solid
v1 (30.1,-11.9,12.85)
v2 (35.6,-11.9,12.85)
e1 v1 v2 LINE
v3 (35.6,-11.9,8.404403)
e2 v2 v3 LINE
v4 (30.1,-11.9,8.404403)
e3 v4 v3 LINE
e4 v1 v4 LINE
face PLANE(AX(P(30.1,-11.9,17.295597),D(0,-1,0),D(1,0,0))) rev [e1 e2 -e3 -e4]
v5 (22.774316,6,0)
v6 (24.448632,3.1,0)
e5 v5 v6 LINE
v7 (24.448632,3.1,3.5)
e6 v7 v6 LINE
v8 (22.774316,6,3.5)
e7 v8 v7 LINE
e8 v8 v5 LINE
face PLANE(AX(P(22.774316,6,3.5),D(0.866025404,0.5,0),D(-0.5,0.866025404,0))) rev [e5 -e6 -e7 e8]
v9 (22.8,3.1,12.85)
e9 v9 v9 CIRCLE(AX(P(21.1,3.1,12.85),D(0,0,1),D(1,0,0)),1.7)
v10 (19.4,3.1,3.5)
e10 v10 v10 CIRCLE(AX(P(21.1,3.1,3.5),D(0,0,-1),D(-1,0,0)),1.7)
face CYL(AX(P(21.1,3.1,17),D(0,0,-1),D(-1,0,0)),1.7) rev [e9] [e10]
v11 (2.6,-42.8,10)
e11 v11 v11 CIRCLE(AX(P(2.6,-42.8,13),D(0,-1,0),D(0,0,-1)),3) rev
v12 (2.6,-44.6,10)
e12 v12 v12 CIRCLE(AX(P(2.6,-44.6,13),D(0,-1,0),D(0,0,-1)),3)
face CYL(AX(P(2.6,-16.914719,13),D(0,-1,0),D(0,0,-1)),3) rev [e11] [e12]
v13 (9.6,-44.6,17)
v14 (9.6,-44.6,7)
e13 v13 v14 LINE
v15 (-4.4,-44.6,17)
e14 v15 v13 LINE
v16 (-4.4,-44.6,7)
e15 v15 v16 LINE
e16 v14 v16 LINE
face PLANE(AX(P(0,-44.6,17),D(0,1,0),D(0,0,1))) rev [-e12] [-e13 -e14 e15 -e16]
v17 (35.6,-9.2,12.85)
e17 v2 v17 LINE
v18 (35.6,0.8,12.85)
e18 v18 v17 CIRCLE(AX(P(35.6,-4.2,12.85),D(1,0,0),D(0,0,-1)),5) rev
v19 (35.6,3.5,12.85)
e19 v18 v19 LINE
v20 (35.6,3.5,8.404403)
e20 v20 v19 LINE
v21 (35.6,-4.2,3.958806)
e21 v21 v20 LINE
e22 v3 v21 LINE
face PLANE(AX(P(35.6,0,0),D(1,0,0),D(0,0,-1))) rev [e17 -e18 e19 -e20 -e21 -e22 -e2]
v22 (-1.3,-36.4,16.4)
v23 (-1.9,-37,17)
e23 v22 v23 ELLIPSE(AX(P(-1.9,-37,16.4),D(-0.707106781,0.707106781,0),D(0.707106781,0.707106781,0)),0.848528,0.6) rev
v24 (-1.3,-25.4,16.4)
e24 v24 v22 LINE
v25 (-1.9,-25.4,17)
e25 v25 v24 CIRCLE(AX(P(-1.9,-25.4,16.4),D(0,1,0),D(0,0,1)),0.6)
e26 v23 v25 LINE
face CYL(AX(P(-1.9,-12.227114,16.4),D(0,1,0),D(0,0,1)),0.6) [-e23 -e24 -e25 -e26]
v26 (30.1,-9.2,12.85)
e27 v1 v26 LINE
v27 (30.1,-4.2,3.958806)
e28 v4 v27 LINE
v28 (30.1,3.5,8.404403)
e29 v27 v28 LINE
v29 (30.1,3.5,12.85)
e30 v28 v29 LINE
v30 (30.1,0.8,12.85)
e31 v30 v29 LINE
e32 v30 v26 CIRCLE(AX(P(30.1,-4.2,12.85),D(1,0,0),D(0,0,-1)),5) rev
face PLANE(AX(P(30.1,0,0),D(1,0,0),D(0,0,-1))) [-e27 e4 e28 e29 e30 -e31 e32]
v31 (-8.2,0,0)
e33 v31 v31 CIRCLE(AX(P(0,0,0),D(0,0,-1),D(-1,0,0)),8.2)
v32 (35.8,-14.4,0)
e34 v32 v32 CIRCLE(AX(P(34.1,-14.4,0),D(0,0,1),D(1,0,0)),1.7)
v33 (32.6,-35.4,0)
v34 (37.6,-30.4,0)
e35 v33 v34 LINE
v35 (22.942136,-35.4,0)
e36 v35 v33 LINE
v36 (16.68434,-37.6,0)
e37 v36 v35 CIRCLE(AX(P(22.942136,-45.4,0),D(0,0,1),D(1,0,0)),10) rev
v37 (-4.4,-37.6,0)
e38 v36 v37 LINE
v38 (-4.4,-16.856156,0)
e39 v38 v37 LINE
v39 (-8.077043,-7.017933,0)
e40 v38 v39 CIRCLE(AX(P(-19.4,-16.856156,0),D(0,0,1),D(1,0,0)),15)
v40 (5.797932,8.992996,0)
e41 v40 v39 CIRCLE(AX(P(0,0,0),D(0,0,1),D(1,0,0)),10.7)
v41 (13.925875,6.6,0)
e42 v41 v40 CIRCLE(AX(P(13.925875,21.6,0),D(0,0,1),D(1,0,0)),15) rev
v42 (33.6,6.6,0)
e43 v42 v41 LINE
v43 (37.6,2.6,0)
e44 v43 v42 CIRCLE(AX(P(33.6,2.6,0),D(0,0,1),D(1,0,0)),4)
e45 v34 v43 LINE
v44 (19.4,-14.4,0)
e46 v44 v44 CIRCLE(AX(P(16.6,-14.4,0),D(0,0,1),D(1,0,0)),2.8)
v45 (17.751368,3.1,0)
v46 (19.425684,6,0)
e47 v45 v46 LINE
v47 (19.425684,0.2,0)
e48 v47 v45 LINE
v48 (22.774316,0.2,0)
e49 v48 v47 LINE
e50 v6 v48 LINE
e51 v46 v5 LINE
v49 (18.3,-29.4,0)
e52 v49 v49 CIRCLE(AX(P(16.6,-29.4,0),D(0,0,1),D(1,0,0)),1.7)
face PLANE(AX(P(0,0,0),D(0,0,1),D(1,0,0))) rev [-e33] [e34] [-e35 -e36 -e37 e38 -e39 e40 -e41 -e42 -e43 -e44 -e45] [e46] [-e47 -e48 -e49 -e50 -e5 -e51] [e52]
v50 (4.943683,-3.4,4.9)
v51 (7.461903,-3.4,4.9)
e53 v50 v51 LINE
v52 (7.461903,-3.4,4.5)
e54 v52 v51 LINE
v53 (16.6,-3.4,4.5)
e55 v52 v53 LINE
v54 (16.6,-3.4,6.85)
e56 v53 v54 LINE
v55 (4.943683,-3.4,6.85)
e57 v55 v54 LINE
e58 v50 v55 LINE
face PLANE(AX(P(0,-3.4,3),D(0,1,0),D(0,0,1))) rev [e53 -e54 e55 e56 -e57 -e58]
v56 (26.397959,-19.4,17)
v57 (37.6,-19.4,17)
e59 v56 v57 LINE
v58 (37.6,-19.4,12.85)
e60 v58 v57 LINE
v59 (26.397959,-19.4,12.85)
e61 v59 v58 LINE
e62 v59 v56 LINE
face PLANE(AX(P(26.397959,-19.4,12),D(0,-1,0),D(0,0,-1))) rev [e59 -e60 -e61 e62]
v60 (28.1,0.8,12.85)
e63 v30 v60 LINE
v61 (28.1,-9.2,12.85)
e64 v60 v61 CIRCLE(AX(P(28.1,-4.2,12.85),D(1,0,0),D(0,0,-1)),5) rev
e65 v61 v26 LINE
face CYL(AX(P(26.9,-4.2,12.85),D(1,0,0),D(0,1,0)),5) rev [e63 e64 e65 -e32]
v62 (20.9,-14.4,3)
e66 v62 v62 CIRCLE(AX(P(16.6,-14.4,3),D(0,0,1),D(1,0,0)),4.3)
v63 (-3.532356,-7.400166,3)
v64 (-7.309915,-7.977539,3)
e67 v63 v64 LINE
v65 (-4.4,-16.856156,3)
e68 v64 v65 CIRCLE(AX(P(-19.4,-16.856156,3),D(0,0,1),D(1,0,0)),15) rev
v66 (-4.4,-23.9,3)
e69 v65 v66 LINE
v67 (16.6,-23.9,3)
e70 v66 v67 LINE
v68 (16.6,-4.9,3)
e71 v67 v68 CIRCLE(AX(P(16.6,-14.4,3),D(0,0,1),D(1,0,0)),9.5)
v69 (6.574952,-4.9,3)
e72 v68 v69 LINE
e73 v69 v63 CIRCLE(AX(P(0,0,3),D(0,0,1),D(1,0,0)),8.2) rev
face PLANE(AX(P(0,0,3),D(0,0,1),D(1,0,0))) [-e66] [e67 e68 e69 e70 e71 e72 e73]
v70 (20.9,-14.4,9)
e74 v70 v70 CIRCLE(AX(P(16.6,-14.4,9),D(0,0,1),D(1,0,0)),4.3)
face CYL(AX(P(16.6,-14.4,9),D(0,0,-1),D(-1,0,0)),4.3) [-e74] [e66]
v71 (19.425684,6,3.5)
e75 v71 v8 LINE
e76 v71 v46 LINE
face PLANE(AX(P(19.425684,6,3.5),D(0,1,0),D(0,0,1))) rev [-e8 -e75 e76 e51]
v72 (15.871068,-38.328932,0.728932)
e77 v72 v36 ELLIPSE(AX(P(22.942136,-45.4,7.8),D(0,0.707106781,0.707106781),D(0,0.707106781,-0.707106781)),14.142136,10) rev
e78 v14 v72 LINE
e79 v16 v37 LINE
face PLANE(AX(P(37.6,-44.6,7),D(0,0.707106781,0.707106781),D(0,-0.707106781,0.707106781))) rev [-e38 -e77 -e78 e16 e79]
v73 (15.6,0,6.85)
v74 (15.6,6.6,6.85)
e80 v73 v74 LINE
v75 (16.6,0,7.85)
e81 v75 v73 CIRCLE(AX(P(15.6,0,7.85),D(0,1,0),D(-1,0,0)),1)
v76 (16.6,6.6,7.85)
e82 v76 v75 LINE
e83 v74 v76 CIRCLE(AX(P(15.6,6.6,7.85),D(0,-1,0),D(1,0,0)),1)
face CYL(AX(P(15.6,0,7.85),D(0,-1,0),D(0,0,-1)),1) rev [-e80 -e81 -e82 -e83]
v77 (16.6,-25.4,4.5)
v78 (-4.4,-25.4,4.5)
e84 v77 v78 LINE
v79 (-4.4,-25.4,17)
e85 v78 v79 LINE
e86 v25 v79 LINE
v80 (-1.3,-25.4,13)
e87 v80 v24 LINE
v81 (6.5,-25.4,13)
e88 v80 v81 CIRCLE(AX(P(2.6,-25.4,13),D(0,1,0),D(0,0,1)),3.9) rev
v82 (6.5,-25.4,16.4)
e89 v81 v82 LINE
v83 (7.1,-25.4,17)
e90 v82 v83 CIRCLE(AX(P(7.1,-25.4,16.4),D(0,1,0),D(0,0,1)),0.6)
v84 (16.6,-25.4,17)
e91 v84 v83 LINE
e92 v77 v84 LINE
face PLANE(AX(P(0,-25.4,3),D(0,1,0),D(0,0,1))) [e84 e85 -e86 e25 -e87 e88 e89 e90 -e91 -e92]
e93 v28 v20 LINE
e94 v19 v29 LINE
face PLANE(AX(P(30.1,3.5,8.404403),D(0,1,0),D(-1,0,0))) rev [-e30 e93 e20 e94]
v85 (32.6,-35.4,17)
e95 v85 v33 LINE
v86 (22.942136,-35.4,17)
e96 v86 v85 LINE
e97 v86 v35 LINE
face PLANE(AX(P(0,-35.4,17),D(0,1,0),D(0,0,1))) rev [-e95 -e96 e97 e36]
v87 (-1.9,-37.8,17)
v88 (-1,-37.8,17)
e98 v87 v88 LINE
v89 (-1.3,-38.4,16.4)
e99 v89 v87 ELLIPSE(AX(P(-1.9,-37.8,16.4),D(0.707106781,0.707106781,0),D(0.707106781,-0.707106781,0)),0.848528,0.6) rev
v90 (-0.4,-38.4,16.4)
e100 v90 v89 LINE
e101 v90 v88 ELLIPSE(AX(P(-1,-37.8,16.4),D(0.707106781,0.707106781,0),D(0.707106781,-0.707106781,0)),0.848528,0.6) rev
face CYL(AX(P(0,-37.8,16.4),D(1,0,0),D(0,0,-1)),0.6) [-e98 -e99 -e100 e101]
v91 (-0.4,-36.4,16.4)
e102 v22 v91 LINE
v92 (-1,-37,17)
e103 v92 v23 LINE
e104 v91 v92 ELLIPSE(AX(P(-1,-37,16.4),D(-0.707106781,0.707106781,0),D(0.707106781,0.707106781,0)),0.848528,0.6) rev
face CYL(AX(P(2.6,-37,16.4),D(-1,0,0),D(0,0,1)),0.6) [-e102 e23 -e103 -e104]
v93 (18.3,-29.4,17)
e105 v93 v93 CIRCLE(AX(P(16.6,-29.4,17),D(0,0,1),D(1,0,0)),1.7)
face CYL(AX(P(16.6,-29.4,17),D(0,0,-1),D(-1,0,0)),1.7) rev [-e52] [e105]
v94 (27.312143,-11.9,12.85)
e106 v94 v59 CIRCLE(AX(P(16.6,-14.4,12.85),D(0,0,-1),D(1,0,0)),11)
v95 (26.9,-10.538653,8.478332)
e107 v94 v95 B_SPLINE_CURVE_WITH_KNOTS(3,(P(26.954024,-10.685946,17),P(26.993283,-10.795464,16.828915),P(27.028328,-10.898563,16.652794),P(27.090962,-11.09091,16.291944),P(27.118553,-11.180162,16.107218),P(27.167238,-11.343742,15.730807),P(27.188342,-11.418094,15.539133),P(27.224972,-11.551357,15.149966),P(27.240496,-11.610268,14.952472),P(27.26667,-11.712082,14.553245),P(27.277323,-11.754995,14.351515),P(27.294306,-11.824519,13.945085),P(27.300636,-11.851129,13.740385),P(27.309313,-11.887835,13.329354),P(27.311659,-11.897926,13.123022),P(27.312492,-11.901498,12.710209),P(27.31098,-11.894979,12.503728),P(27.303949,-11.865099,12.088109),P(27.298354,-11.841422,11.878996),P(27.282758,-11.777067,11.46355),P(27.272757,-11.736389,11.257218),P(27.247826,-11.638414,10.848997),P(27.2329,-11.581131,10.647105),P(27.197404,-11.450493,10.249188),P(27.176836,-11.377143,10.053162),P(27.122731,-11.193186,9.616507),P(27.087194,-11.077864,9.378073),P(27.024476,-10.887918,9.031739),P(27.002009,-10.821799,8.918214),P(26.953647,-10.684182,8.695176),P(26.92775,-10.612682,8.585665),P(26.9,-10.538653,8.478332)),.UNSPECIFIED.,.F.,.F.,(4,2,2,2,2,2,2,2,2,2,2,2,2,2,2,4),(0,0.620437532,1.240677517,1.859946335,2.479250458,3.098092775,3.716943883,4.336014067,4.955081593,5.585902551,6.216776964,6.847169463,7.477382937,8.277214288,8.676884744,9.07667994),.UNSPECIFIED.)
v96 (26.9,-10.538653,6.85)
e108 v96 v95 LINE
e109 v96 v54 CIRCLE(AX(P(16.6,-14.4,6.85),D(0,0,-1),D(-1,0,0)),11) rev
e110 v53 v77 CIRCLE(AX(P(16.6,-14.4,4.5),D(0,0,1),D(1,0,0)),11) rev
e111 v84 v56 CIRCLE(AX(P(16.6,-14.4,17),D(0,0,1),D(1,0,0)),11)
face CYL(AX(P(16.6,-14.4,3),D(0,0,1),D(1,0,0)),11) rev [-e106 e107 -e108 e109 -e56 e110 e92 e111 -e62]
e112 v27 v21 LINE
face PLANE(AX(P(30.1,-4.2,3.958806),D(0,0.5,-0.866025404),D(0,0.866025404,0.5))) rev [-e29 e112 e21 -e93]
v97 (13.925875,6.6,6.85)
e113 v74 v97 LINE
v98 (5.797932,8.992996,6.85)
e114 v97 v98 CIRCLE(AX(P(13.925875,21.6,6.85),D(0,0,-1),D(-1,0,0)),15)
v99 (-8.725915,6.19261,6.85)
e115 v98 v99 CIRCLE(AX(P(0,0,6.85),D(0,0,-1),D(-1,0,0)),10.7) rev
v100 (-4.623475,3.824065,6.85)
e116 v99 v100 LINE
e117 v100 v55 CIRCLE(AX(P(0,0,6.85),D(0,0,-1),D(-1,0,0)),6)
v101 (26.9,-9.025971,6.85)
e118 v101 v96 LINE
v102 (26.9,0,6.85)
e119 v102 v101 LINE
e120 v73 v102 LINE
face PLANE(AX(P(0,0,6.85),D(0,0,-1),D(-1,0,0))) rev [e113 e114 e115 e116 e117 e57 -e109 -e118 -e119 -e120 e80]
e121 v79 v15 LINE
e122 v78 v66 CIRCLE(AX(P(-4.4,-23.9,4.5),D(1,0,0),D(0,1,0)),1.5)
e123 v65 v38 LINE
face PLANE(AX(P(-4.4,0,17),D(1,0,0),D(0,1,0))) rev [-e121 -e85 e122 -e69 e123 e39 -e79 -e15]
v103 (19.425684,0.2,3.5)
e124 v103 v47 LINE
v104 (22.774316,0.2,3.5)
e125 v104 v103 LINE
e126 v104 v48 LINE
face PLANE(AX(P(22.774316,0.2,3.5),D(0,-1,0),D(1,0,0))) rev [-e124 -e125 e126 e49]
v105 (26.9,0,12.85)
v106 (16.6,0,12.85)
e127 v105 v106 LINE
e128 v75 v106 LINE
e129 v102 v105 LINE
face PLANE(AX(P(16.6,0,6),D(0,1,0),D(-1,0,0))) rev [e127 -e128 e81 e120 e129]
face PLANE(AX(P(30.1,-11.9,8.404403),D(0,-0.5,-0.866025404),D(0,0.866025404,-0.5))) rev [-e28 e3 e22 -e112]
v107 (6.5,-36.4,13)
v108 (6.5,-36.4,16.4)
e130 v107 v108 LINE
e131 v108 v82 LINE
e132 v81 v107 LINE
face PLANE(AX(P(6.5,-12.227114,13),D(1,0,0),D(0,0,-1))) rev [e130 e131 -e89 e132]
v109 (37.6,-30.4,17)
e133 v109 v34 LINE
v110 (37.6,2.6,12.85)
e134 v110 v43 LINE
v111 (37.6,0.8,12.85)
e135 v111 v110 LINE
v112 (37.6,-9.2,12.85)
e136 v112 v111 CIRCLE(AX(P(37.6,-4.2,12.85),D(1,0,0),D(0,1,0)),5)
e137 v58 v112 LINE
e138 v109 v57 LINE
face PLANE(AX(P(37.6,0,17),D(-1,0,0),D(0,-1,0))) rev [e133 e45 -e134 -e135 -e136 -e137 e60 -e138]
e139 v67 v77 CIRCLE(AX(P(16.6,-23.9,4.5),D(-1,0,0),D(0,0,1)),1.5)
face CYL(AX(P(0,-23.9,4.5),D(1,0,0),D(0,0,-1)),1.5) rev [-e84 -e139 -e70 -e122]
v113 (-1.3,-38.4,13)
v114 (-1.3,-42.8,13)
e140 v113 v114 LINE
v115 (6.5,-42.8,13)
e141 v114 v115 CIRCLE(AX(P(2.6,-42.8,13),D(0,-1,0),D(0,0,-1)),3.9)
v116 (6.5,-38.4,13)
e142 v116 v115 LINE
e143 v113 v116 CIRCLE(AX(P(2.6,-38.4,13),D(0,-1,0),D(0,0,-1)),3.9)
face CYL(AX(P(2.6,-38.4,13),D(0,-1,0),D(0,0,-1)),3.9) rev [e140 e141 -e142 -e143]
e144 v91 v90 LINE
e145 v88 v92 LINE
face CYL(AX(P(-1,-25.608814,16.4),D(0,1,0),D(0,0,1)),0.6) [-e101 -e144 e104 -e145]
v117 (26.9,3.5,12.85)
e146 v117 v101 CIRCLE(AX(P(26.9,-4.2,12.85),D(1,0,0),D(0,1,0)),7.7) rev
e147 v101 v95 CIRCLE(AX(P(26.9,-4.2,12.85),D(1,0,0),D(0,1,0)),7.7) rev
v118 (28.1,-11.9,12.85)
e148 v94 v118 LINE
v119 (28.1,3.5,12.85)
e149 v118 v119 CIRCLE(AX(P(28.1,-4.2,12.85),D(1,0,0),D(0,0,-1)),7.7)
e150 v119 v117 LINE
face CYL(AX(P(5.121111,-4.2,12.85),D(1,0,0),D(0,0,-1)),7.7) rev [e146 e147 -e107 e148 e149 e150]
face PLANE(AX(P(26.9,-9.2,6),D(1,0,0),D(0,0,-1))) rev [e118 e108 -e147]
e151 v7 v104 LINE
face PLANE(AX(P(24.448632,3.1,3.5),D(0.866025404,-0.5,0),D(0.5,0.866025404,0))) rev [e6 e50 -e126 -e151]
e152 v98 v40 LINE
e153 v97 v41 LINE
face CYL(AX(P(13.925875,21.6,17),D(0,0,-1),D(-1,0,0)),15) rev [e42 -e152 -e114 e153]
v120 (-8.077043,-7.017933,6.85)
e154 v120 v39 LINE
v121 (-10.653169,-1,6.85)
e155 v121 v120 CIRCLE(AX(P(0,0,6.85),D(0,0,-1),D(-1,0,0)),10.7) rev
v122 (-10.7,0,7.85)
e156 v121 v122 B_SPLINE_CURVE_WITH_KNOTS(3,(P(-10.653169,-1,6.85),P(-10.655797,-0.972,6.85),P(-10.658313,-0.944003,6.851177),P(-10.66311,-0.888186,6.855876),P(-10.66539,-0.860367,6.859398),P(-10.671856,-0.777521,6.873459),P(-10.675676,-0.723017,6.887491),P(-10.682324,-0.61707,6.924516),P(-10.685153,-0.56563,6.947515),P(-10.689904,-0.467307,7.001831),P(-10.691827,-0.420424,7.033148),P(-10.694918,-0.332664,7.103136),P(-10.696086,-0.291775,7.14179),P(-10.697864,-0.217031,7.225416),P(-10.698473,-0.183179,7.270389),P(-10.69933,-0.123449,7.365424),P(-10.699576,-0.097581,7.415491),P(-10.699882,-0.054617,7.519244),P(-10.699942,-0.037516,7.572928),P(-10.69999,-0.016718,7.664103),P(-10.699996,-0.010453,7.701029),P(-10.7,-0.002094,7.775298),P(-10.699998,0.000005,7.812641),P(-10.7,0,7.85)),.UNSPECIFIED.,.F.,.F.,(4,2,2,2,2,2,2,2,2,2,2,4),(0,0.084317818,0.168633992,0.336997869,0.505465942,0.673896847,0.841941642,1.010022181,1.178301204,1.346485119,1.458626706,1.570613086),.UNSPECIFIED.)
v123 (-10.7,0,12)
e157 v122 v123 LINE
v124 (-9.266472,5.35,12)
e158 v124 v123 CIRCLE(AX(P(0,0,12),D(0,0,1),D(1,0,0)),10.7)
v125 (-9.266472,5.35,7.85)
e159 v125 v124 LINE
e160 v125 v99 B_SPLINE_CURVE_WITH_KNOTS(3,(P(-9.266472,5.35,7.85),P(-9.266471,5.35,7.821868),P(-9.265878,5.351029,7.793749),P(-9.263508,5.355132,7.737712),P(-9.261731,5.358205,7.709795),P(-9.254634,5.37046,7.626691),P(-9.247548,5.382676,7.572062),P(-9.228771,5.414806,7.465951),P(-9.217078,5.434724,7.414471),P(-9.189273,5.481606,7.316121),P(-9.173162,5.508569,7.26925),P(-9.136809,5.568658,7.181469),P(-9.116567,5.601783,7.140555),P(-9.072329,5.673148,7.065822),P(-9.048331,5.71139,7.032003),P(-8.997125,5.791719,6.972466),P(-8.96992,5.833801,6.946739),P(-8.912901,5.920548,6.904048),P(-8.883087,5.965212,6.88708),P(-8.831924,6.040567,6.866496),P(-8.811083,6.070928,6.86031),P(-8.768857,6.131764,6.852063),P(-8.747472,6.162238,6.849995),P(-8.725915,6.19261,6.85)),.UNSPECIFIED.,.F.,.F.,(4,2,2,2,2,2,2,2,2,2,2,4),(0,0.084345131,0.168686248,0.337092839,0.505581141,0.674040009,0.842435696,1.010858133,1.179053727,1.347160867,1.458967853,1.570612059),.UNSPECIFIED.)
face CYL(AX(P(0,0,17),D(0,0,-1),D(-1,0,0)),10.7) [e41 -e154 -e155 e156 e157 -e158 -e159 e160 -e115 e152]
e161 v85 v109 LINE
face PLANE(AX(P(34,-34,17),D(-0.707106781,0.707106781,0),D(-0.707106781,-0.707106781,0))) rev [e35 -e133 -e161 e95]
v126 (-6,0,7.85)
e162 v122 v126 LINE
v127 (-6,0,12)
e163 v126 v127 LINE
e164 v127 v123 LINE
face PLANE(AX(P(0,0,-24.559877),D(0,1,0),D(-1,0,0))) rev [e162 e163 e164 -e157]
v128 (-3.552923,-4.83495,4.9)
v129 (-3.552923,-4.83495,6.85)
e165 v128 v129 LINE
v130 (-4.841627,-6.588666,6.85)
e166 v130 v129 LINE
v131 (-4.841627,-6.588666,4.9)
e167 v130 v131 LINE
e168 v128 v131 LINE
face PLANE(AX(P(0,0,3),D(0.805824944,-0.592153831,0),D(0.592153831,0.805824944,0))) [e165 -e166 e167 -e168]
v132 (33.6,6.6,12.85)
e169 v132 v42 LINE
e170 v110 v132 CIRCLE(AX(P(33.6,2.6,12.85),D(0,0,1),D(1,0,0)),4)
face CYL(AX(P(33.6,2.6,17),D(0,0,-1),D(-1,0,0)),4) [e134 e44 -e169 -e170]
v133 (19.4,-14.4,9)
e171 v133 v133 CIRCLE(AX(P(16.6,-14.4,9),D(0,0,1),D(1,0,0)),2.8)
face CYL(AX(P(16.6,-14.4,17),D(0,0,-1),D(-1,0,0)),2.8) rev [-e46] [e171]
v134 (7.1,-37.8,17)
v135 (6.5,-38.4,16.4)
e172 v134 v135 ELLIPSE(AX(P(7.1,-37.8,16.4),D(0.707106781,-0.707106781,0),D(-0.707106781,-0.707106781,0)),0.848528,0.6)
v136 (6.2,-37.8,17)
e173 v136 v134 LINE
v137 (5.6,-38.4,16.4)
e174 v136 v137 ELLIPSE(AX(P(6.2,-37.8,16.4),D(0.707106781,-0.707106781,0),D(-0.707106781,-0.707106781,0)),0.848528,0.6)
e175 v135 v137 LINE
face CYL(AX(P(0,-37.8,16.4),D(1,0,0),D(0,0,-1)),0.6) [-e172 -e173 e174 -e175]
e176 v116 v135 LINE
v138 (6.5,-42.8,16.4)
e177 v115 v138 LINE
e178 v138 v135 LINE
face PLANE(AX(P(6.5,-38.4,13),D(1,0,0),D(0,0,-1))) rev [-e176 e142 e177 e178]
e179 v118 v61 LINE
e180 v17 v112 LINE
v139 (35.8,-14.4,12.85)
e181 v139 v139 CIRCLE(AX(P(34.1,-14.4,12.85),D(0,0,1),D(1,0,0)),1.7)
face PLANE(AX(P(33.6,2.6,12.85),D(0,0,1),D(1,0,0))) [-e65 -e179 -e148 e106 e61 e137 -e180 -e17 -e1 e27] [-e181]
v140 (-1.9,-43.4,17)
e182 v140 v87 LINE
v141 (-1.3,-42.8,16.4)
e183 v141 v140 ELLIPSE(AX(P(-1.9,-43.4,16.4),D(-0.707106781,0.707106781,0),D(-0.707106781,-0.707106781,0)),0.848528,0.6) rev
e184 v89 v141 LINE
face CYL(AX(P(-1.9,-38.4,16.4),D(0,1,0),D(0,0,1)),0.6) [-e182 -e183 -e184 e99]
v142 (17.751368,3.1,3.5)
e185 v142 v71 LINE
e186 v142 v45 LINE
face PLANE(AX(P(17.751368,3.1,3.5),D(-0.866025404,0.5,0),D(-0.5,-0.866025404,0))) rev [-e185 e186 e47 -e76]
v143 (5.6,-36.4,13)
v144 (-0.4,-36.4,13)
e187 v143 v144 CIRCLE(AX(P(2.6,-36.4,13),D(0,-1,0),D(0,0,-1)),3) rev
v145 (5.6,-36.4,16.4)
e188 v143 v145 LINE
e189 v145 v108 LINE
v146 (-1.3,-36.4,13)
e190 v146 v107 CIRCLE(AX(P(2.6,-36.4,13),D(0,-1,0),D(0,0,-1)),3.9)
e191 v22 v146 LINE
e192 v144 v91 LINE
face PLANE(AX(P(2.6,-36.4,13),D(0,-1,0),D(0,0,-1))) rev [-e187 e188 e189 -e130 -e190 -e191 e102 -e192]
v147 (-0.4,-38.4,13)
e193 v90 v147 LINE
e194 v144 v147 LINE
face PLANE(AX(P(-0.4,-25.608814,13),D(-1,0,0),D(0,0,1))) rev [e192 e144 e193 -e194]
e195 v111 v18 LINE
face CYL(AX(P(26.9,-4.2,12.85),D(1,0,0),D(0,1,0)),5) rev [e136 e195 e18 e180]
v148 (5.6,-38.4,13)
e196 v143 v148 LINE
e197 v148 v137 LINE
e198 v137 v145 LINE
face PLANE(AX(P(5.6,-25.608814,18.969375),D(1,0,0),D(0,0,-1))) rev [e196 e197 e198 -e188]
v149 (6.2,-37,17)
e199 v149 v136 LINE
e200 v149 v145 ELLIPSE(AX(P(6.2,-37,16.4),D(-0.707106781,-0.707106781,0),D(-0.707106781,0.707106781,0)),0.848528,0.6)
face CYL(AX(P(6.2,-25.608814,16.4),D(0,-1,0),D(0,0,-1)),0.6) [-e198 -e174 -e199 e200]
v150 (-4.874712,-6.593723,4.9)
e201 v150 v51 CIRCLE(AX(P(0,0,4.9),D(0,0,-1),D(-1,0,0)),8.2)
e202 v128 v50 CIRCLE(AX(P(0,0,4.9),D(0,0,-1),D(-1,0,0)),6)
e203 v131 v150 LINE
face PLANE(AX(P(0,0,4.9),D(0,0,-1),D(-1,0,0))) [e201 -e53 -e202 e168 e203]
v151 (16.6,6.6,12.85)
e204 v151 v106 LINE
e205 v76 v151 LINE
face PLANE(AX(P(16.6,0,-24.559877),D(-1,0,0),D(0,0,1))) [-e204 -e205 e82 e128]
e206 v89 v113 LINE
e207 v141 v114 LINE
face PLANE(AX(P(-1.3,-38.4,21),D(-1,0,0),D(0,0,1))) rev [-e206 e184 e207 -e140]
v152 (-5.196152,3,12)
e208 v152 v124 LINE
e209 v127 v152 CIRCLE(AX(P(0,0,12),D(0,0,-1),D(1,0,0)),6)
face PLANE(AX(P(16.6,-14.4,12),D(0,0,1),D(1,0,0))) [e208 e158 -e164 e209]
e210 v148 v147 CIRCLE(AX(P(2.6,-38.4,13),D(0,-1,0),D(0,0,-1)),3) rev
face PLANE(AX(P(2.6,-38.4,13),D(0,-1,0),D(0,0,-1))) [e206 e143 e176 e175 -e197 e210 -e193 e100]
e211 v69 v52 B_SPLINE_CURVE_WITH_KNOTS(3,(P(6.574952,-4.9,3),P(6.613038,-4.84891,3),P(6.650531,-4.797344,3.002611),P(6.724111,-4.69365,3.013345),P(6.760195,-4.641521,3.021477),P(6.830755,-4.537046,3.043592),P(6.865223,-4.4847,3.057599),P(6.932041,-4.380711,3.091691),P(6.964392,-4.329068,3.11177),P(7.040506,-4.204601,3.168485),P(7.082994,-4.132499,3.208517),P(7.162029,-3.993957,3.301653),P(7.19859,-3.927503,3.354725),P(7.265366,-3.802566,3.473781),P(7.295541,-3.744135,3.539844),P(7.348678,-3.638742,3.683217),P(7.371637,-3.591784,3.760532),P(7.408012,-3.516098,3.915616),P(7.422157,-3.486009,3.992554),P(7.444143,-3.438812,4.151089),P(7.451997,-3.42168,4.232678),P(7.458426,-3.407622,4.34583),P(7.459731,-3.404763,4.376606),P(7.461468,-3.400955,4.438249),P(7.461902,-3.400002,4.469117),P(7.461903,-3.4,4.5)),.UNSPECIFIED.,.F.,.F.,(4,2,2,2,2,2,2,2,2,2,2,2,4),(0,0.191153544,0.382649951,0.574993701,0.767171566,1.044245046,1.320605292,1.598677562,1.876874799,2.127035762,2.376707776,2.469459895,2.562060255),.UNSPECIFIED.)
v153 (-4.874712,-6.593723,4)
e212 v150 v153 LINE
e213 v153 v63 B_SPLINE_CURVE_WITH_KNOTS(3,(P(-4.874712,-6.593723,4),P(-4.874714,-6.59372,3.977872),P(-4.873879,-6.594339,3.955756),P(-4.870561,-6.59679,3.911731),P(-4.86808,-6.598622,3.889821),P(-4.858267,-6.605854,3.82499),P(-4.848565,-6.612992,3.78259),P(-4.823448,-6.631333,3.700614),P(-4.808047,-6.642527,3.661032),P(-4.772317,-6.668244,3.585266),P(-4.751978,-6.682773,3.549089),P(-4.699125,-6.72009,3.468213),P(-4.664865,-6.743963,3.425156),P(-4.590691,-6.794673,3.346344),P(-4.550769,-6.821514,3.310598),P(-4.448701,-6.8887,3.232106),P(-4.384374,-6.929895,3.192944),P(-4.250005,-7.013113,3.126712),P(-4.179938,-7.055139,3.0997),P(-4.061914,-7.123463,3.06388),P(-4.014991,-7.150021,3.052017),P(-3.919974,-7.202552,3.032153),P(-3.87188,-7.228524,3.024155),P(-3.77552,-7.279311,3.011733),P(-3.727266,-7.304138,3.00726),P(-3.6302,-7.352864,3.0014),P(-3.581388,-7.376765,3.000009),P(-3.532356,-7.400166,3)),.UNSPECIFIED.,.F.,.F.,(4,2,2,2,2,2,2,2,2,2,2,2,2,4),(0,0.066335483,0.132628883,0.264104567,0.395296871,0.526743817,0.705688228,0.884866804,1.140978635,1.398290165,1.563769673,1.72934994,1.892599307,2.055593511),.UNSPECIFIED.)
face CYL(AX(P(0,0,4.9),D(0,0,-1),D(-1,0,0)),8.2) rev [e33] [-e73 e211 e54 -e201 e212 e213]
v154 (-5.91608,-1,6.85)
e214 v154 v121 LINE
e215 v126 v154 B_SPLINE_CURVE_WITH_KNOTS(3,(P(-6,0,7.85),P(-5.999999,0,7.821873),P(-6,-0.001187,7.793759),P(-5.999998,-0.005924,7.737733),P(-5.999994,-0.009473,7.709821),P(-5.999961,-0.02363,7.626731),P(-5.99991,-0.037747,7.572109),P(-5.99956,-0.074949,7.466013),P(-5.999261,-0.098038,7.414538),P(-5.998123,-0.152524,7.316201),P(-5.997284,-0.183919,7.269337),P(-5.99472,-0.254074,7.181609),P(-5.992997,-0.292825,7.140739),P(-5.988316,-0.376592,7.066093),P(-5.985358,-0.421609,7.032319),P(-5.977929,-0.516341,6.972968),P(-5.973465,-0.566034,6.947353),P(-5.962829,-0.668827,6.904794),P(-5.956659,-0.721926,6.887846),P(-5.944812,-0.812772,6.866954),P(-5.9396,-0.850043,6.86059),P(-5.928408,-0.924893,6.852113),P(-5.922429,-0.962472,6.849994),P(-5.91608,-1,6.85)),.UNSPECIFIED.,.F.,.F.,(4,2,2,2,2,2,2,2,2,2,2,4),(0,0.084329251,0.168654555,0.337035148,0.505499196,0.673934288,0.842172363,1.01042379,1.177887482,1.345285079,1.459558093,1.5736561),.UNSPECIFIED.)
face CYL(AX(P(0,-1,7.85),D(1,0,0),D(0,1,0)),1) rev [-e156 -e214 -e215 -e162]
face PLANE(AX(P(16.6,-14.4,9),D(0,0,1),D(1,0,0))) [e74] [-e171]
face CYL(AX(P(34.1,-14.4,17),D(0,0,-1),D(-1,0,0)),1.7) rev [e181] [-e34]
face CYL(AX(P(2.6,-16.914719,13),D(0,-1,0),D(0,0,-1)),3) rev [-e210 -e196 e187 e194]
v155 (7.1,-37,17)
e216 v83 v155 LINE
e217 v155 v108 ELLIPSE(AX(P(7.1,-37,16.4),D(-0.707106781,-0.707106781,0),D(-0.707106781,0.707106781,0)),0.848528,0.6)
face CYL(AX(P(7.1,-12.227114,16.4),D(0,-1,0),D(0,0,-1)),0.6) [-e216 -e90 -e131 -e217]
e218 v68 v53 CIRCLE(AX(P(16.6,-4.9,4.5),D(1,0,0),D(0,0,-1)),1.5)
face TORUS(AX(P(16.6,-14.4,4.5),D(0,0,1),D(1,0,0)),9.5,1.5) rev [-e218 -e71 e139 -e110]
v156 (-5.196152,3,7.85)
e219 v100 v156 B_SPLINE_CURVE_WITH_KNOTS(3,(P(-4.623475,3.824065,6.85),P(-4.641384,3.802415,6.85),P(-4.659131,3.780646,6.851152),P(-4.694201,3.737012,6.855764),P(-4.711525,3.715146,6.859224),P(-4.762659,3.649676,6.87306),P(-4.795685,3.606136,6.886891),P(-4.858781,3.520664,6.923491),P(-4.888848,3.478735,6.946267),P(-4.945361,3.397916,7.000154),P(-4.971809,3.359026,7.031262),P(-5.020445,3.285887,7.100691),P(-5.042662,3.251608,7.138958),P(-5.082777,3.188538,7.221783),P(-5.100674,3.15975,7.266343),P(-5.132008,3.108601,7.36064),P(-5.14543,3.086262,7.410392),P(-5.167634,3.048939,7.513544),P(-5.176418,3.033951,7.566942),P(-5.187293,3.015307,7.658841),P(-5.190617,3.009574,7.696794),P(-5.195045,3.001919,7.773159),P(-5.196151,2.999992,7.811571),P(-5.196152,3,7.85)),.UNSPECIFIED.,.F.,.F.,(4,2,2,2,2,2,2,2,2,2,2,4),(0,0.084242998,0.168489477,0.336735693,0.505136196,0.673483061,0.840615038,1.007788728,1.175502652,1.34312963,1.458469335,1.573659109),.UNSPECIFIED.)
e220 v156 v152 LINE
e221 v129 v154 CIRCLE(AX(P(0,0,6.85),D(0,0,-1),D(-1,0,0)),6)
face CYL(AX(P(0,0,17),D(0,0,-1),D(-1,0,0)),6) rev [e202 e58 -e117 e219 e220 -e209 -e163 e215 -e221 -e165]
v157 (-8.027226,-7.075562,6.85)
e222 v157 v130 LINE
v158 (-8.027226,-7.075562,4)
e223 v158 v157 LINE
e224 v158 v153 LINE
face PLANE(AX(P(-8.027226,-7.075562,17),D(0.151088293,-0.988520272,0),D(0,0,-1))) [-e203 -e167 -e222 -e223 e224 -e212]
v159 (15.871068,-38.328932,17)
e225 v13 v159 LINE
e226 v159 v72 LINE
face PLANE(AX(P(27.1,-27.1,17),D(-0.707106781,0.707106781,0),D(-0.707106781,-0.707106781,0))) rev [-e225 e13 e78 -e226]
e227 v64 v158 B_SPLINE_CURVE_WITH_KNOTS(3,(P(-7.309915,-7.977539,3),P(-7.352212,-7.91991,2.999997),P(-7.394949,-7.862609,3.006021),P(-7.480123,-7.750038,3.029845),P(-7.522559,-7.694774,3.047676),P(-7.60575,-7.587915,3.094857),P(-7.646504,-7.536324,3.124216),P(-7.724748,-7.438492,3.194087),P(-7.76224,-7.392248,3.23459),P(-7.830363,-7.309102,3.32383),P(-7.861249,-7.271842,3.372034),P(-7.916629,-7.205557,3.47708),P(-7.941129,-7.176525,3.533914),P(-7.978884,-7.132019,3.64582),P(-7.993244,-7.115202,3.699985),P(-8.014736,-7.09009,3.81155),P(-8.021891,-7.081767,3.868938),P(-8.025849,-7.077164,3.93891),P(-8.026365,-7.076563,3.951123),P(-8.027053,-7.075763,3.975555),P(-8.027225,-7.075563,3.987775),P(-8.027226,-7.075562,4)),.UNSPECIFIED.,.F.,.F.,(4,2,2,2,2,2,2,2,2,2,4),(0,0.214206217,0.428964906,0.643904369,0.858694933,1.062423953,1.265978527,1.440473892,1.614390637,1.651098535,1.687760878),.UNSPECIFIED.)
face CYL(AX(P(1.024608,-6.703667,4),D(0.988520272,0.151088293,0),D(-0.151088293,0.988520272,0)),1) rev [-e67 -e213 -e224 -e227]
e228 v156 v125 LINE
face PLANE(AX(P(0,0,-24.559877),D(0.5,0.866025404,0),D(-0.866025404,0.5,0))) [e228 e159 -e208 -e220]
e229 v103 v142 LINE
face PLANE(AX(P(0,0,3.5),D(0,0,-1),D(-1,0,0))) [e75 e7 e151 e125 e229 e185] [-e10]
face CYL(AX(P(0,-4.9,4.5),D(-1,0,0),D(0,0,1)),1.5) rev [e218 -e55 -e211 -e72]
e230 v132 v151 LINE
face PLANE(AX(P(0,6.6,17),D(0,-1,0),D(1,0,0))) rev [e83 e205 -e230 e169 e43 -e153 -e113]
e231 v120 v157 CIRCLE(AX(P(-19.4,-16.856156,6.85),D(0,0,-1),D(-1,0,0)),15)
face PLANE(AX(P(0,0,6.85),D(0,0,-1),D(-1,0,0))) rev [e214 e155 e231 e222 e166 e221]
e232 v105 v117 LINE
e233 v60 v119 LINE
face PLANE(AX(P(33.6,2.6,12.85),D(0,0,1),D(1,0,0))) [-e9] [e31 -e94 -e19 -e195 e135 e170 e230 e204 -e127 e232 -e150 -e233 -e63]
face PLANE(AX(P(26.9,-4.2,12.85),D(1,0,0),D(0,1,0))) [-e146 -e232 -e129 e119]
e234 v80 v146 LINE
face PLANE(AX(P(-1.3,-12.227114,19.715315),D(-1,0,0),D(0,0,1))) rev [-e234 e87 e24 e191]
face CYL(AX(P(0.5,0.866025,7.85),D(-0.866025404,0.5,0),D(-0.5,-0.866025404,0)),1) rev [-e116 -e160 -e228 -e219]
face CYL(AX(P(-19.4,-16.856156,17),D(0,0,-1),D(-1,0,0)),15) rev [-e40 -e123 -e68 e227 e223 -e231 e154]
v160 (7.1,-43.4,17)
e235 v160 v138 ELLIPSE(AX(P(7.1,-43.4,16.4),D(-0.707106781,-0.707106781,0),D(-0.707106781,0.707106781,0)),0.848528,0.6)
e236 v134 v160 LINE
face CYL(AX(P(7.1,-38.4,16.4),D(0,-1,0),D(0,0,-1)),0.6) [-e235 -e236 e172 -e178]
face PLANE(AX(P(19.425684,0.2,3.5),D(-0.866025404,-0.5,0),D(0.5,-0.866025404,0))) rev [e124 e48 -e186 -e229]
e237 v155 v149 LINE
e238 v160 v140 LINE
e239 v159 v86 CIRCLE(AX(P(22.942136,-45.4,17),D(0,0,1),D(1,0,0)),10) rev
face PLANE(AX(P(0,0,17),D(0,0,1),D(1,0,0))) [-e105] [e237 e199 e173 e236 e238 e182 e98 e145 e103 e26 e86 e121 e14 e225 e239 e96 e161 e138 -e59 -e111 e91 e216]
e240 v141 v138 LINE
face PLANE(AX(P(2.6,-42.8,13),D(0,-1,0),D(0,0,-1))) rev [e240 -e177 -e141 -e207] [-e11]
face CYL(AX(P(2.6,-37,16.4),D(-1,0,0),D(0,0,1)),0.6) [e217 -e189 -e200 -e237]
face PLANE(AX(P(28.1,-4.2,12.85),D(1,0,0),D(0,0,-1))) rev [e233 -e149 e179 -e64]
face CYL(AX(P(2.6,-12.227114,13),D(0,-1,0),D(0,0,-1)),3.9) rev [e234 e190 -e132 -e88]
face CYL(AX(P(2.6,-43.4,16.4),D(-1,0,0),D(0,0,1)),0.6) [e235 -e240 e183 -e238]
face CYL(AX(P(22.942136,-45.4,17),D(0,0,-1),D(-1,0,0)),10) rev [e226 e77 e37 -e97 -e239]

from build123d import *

# Parameters (mm, degrees)
ESBO_O1_R                = 2.8
ESBO_O1_R_2              = 1.7
ESBO_O1_R_3              = 6
RESSALTO_EXTRUS_O1_DEPTH = 17
CORTE_EXTRUS_O1_DEPTH    = 3.5
ESBO_O3_R                = 8.2
CORTE_EXTRUS_O2_DEPTH    = 4.9
CORTE_EXTRUS_O3_DEPTH    = 64.577983611
CORTE_EXTRUS_O4_START    = -14
ESBO_O7_R                = 2.8
CORTE_EXTRUS_O4_DEPTH    = 14
CORTE_EXTRUS_O5_START    = -5
CORTE_EXTRUS_O5_DEPTH    = 5
ESBO_O9_R                = 4.3
ESBO_O9_R_2              = 2.8
RESSALTO_EXTRUS_O2_DEPTH = 6
ESBO_O6_R                = 3
CORTE_EXTRUS_O6_DEPTH    = 19.2
CORTE_EXTRUS_O7_DEPTH    = 4.4
CORTE_EXTRUS_O8_DEPTH    = 11
CORTE_EXTRUS_O9_DEPTH    = 2
FILETE2_R                = 0.6
CORTE_EXTRUS_O10_START   = -5.15
CORTE_EXTRUS_O10_DEPTH   = 5.15
ESBO_O18_R               = 1.7
RESSALTO_EXTRUS_O3_DEPTH = 0.85
FILETE3_R                = 1
ESBO_O14_R               = 5
CORTE_EXTRUS_O11_DEPTH   = 10.7
CORTE_EXTRUS_O13_DEPTH   = 5.5
CORTE_EXTRUS_O14_START   = -6.85
CORTE_EXTRUS_O14_DEPTH   = 6.85
RESSALTO_EXTRUS_O4_DEPTH = 0.85
CHANFRO3_SIZE            = 3
FILETE4_R                = 1
FILETE5_R                = 1.5
CORTE_EXTRUS_O15_REACH   = 63.511
ESBO_O20_R               = 7.7
CORTE_EXTRUS_O16_START   = -6
CORTE_EXTRUS_O16_DEPTH   = 6


with BuildPart() as part:
    # Esboço1 → Ressalto-extrusão1 (new body)
    with BuildSketch(Plane.XY):
        with BuildLine():
            Line((-4.4, -16.856156145), (-4.4, -44.6))
            Line((-4.4, -44.6), (9.6, -44.6))
            Line((9.6, -44.6), (15.871067812, -38.328932188))
            ThreePointArc((15.871067812, -38.328932188), (19.1153013, -36.161204675), (22.942135624, -35.4))
            Line((22.942135624, -35.4), (32.6, -35.4))
            Line((32.6, -35.4), (37.6, -30.4))
            Line((37.6, -30.4), (37.6, 2.6))
            ThreePointArc((37.6, 2.6), (36.428427125, 5.428427125), (33.6, 6.6))
            Line((33.6, 6.6), (13.925875197, 6.6))
            ThreePointArc((13.925875197, 6.6), (9.689429656, 7.210680031), (5.797932475, 8.992996109))
            ThreePointArc((5.797932475, 8.992996109), (-8.086163888, 7.007421322), (-8.077042802, -7.017932714))
            ThreePointArc((-8.077042802, -7.017932714), (-5.349299698, -11.604697204), (-4.4, -16.856156145))
        make_face()
        with Locations((16.6, -14.4)):
            Circle(ESBO_O1_R, mode=Mode.SUBTRACT)
        with Locations((34.1, -14.4)):
            Circle(ESBO_O1_R_2, mode=Mode.SUBTRACT)
        with Locations((16.6, -29.4)):
            Circle(ESBO_O1_R_2, mode=Mode.SUBTRACT)
        with Locations((21.1, 3.1)):
            Circle(ESBO_O1_R_2, mode=Mode.SUBTRACT)
        Circle(ESBO_O1_R_3, mode=Mode.SUBTRACT)
    extrude(amount=RESSALTO_EXTRUS_O1_DEPTH)

    # Esboço2 → Corte-extrusão1 (cut)
    with BuildSketch(Plane(origin=(0, 0, 0), x_dir=(-1, 0, 0), z_dir=(0, 0, -1))):
        Polygon((-19.425684219, 0.2), (-17.751368439, 3.1), (-19.425684219, 6), (-22.774315781, 6), (-24.448631561, 3.1), (-22.774315781, 0.2), align=None)
    extrude(amount=-CORTE_EXTRUS_O1_DEPTH, mode=Mode.SUBTRACT)

    # Esboço3 → Corte-extrusão2 (cut)
    with BuildSketch(Plane(origin=(0, 0, 0), x_dir=(-1, 0, 0), z_dir=(0, 0, -1))):
        Circle(ESBO_O3_R)
    extrude(amount=-CORTE_EXTRUS_O2_DEPTH, mode=Mode.SUBTRACT)

    # Esboço5 → Corte-extrusão3 (cut, through all)
    with BuildSketch(Plane.ZY.offset(4.4)):
        Polygon((0, -44.6), (7, -44.6), (0, -37.6), align=None)
    extrude(amount=-CORTE_EXTRUS_O3_DEPTH, mode=Mode.SUBTRACT)

    # Esboço7 → Corte-extrusão4 (cut)
    # profile 1 of 2: a face of its own
    with BuildSketch(Plane.XY.offset(17).offset(CORTE_EXTRUS_O4_START)):
        with BuildLine():
            ThreePointArc((-5.033307562, -6.849512026), (2.207972734, -8.208218833), (7.790378681, -3.4))
            Line((7.790378681, -3.4), (4.943682838, -3.4))
            ThreePointArc((4.943682838, -3.4), (0.999161337, -5.916221482), (-3.552922985, -4.834949665))
            Line((-3.552922985, -4.834949665), (-5.033307562, -6.849512026))
        make_face()
    # profile 2 of 2: a face of its own
    with BuildSketch(Plane.XY.offset(17).offset(CORTE_EXTRUS_O4_START)):
        with BuildLine():
            ThreePointArc((16.6, -25.4), (27.6, -14.4), (16.6, -3.4))
            Line((16.6, -3.4), (7.790378681, -3.4))
            ThreePointArc((7.790378681, -3.4), (2.207972734, -8.208218833), (-5.033307562, -6.849512026))
            Line((-5.033307562, -6.849512026), (-6.618088542, -9.006140892))
            ThreePointArc((-6.618088542, -9.006140892), (-4.965169349, -12.777472036), (-4.4, -16.856156145))
            Line((-4.4, -16.856156145), (-4.4, -25.4))
            Line((-4.4, -25.4), (16.6, -25.4))
        make_face()
        with Locations((16.6, -14.4)):
            Circle(ESBO_O7_R, mode=Mode.SUBTRACT)
    extrude(amount=CORTE_EXTRUS_O4_DEPTH, mode=Mode.SUBTRACT)

    # Esboço8 → Corte-extrusão5 (cut)
    with BuildSketch(Plane.XY.offset(17).offset(CORTE_EXTRUS_O5_START)):
        with BuildLine():
            Line((26.397958971, -19.4), (37.6, -19.4))
            Line((37.6, -19.4), (37.6, 2.6))
            ThreePointArc((37.6, 2.6), (36.428427125, 5.428427125), (33.6, 6.6))
            Line((33.6, 6.6), (13.925875197, 6.6))
            ThreePointArc((13.925875197, 6.6), (9.689429656, 7.210680031), (5.797932475, 8.992996109))
            ThreePointArc((5.797932475, 8.992996109), (-8.086163888, 7.007421322), (-8.077042802, -7.017932714))
            ThreePointArc((-8.077042802, -7.017932714), (-7.306637516, -7.982003576), (-6.618088542, -9.006140892))
            Line((-6.618088542, -9.006140892), (-3.552922985, -4.834949665))
            ThreePointArc((-3.552922985, -4.834949665), (-0.999161337, 5.916221482), (4.943682838, -3.4))
            Line((4.943682838, -3.4), (16.6, -3.4))
            ThreePointArc((16.6, -3.4), (25.98083152, -8.655437353), (26.397958971, -19.4))
        make_face()
    extrude(amount=CORTE_EXTRUS_O5_DEPTH, mode=Mode.SUBTRACT)

    # Esboço9 → Ressalto-extrusão2 (add)
    with BuildSketch(Plane.XY.offset(3)):
        with Locations((16.6, -14.4)):
            Circle(ESBO_O9_R)
        with Locations((16.6, -14.4)):
            Circle(ESBO_O9_R_2, mode=Mode.SUBTRACT)
    extrude(amount=RESSALTO_EXTRUS_O2_DEPTH)

    # Esboço6 → Corte-extrusão6 (cut)
    with BuildSketch(Plane.XZ.offset(44.6)):
        with Locations(Location((2.6, 13, 0), (0, 0, 270))):
            Circle(ESBO_O6_R)
    extrude(amount=-CORTE_EXTRUS_O6_DEPTH, mode=Mode.SUBTRACT)

    # Esboço10 → Corte-extrusão7 (cut)
    with BuildSketch(Plane(origin=(0, -42.8, 0), x_dir=(-1, 0, 0), z_dir=(0, -1, 0))):
        with BuildLine():
            Line((-6.5, -13), (-6.5, -21))
            Line((-6.5, -21), (1.3, -21))
            Line((1.3, -21), (1.3, -13))
            ThreePointArc((1.3, -13), (-2.6, -9.1), (-6.5, -13))
        make_face()
    extrude(amount=-CORTE_EXTRUS_O7_DEPTH, mode=Mode.SUBTRACT)

    # Esboço11 → Corte-extrusão8 (cut)
    with BuildSketch(Plane(origin=(0, -36.4, 0), x_dir=(-1, 0, 0), z_dir=(0, -1, 0))):
        with BuildLine():
            Line((-6.5, -13), (-6.5, -19.715315286))
            Line((-6.5, -19.715315286), (1.3, -19.715315286))
            Line((1.3, -19.715315286), (1.3, -13))
            ThreePointArc((1.3, -13), (-2.6, -9.1), (-6.5, -13))
        make_face()
    extrude(amount=-CORTE_EXTRUS_O8_DEPTH, mode=Mode.SUBTRACT)

    # Esboço12 → Corte-extrusão9 (cut)
    with BuildSketch(Plane.XZ.offset(38.4)):
        with BuildLine():
            Line((-0.4, 13), (-0.4, 18.969375471))
            Line((-0.4, 18.969375471), (5.6, 18.969375471))
            Line((5.6, 18.969375471), (5.6, 13))
            ThreePointArc((5.6, 13), (2.6, 10), (-0.4, 13))
        make_face()
    extrude(amount=-CORTE_EXTRUS_O9_DEPTH, mode=Mode.SUBTRACT)

    # Filete2
    filete2_edges = [part.edges().sort_by_distance(p)[0] for p in [
        (6.5, -40.6, 17),
        (-1.3, -40.6, 17),
        (-0.85, -38.4, 17),
        (2.6, -42.8, 17),
        (-0.85, -36.4, 17),
        (6.5, -30.9, 17),
        (-1.3, -30.9, 17),
        (6.05, -36.4, 17),
        (6.05, -38.4, 17),
        (-0.4, -37.4, 17),
        (5.6, -37.4, 17),
    ]]
    fillet(filete2_edges, radius=FILETE2_R)

    # Esboço13 → Corte-extrusão10 (cut)
    with BuildSketch(Plane.XY.offset(12).offset(CORTE_EXTRUS_O10_START)):
        with BuildLine():
            Line((16.6, -3.4), (16.6, 6.6))
            Line((16.6, 6.6), (13.925875197, 6.6))
            ThreePointArc((13.925875197, 6.6), (9.689429656, 7.210680031), (5.797932475, 8.992996109))
            ThreePointArc((5.797932475, 8.992996109), (-2.515063908, 10.40021411), (-9.26647182, 5.35))
            Line((-9.26647182, 5.35), (-5.196152423, 3))
            ThreePointArc((-5.196152423, 3), (3.202488911, 5.073860934), (4.943682838, -3.4))
            Line((4.943682838, -3.4), (16.6, -3.4))
        make_face()
        with BuildLine():
            ThreePointArc((-3.552922985, -4.834949665), (-5.353388549, -2.709470621), (-6, 0))
            Line((-6, 0), (-10.7, 0))
            ThreePointArc((-10.7, 0), (-10.022832882, -3.746040711), (-8.077042802, -7.017932714))
            ThreePointArc((-8.077042802, -7.017932714), (-7.306637516, -7.982003576), (-6.618088542, -9.006140892))
            Line((-6.618088542, -9.006140892), (-3.552922985, -4.834949665))
        make_face()
    extrude(amount=CORTE_EXTRUS_O10_DEPTH, mode=Mode.SUBTRACT)

    # Esboço18 → Ressalto-extrusão3 (add)
    with BuildSketch(Plane.XY.offset(12)):
        with BuildLine():
            Line((33.6, 6.6), (16.6, 6.6))
            Line((16.6, 6.6), (16.6, -3.4))
            ThreePointArc((16.6, -3.4), (25.98083152, -8.655437353), (26.397958971, -19.4))
            Line((26.397958971, -19.4), (37.6, -19.4))
            Line((37.6, -19.4), (37.6, 2.6))
            ThreePointArc((37.6, 2.6), (36.428427125, 5.428427125), (33.6, 6.6))
        make_face()
        with Locations(Location((21.1, 3.1, 0), (0, 0, 180))):
            Circle(ESBO_O18_R, mode=Mode.SUBTRACT)
        with Locations((34.1, -14.4)):
            Circle(ESBO_O18_R, mode=Mode.SUBTRACT)
    extrude(amount=RESSALTO_EXTRUS_O3_DEPTH)

    # Filete3
    filete3_edges = [part.edges().sort_by_distance(p)[0] for p in [
        (-8.35, 0, 6.85),
        (-7.231312122, 4.175, 6.85),
    ]]
    fillet(filete3_edges, radius=FILETE3_R)

    # Esboço14 → Corte-extrusão11 (cut)
    with BuildSketch(Plane(origin=(37.6, 0, 0), x_dir=(0, 0, -1), z_dir=(1, 0, 0))):
        with Locations((-12.85, -4.2)):
            Circle(ESBO_O14_R)
    extrude(amount=-CORTE_EXTRUS_O11_DEPTH, mode=Mode.SUBTRACT)

    # Esboço16 → Corte-extrusão13 (cut)
    with BuildSketch(Plane(origin=(35.6, 0, 0), x_dir=(0, 0, -1), z_dir=(1, 0, 0))):
        Polygon((-3.958805854, -4.2), (-8.404402927, 3.5), (-17.295597073, 3.5), (-21.741194146, -4.2), (-17.295597073, -11.9), (-8.404402927, -11.9), align=None)
    extrude(amount=-CORTE_EXTRUS_O13_DEPTH, mode=Mode.SUBTRACT)

    # Esboço17 → Corte-extrusão14 (cut)
    with BuildSketch(Plane.XY.offset(12.85).offset(CORTE_EXTRUS_O14_START)):
        with BuildLine():
            Line((16.6, 0), (26.9, 0))
            Line((26.9, 0), (26.9, -9.2))
            Line((26.9, -9.2), (26.293296653, -9.2))
            ThreePointArc((26.293296653, -9.2), (22.248008499, -4.960720366), (16.6, -3.4))
            Line((16.6, -3.4), (16.6, 0))
        make_face()
    extrude(amount=CORTE_EXTRUS_O14_DEPTH, mode=Mode.SUBTRACT)

    # Esboço19 → Ressalto-extrusão4 (add)
    with BuildSketch(Plane.XY.offset(6)):
        with BuildLine():
            Line((26.9, 0), (16.6, 0))
            Line((16.6, 0), (16.6, -3.4))
            ThreePointArc((16.6, -3.4), (22.248008499, -4.960720366), (26.293296653, -9.2))
            Line((26.293296653, -9.2), (26.9, -9.2))
            Line((26.9, -9.2), (26.9, 0))
        make_face()
    extrude(amount=RESSALTO_EXTRUS_O4_DEPTH)

    # Chanfro3
    # the kernel refuses this chamfer: 3, 2.302242201 mm, written as the material it takes off along each edge
    with BuildSketch(Plane(origin=(-6.618088542, -9.006140892, 3), x_dir=(0.5921538308022283, 0.8058249441822001, 0), z_dir=(0, 0, 1))) as chanfro3_piece_1:
        with BuildLine():
            Line((CHANFRO3_SIZE, 0), (0.721282145, 2.278717855))
            ThreePointArc((0.721282145, 2.278717855), (0.414475085, 1.151512434), (0, 0))
            Line((0, 0), (CHANFRO3_SIZE, 0))
        make_face()
    extrude(amount=11.565048964, mode=Mode.SUBTRACT)

    # Filete4
    filete4_edges = [part.edges().sort_by_distance(p)[0] for p in [
        (16.6, 3.3, 6.85),
        (-6.450969198, -6.834642561, 3),
    ]]
    fillet(filete4_edges, radius=FILETE4_R)

    # Filete5
    filete5_edges = [part.edges().sort_by_distance(p)[0] for p in [
        (6.1, -25.4, 3),
        (12.030951621, -3.4, 3),
        (27.6, -14.4, 3),
    ]]
    fillet(filete5_edges, radius=FILETE5_R)

    # Corte-extrusão15: up to this face of the body (flat: up to its plane)
    corte_extrus_o15_end = Plane(part.part.faces().sort_by_distance((26.9, 0.32230104, 11.820844332))[0])
    # Esboço20 → Corte-extrusão15 (cut, up to the picked face)
    with BuildSketch(Plane(origin=(28.1, 0, 0), x_dir=(0, 0, -1), z_dir=(1, 0, 0)), mode=Mode.PRIVATE) as corte_extrus_o15_sk1:
        with Locations((-12.85, -4.2)):
            Circle(ESBO_O20_R)
    corte_extrus_o15_tool1 = split(extrude(corte_extrus_o15_sk1.sketch, amount=-CORTE_EXTRUS_O15_REACH, mode=Mode.PRIVATE), bisect_by=corte_extrus_o15_end, keep=Keep.BOTH, mode=Mode.PRIVATE)
    add(corte_extrus_o15_tool1.solids().sort_by(Axis((28.1, -4.2, 12.85), (-1, 0, 0)))[0], mode=Mode.SUBTRACT)

    # Esboço21 → Corte-extrusão16 (cut)
    with BuildSketch(Plane.XY.offset(12.85).offset(CORTE_EXTRUS_O16_START)):
        with BuildLine():
            Line((26.9, -10.538653085), (26.9, -9.2))
            Line((26.9, -9.2), (26.293296653, -9.2))
            ThreePointArc((26.293296653, -9.2), (26.619030681, -9.859182429), (26.9, -10.538653085))
        make_face()
    extrude(amount=CORTE_EXTRUS_O16_DEPTH, mode=Mode.SUBTRACT)


solid = part.part
